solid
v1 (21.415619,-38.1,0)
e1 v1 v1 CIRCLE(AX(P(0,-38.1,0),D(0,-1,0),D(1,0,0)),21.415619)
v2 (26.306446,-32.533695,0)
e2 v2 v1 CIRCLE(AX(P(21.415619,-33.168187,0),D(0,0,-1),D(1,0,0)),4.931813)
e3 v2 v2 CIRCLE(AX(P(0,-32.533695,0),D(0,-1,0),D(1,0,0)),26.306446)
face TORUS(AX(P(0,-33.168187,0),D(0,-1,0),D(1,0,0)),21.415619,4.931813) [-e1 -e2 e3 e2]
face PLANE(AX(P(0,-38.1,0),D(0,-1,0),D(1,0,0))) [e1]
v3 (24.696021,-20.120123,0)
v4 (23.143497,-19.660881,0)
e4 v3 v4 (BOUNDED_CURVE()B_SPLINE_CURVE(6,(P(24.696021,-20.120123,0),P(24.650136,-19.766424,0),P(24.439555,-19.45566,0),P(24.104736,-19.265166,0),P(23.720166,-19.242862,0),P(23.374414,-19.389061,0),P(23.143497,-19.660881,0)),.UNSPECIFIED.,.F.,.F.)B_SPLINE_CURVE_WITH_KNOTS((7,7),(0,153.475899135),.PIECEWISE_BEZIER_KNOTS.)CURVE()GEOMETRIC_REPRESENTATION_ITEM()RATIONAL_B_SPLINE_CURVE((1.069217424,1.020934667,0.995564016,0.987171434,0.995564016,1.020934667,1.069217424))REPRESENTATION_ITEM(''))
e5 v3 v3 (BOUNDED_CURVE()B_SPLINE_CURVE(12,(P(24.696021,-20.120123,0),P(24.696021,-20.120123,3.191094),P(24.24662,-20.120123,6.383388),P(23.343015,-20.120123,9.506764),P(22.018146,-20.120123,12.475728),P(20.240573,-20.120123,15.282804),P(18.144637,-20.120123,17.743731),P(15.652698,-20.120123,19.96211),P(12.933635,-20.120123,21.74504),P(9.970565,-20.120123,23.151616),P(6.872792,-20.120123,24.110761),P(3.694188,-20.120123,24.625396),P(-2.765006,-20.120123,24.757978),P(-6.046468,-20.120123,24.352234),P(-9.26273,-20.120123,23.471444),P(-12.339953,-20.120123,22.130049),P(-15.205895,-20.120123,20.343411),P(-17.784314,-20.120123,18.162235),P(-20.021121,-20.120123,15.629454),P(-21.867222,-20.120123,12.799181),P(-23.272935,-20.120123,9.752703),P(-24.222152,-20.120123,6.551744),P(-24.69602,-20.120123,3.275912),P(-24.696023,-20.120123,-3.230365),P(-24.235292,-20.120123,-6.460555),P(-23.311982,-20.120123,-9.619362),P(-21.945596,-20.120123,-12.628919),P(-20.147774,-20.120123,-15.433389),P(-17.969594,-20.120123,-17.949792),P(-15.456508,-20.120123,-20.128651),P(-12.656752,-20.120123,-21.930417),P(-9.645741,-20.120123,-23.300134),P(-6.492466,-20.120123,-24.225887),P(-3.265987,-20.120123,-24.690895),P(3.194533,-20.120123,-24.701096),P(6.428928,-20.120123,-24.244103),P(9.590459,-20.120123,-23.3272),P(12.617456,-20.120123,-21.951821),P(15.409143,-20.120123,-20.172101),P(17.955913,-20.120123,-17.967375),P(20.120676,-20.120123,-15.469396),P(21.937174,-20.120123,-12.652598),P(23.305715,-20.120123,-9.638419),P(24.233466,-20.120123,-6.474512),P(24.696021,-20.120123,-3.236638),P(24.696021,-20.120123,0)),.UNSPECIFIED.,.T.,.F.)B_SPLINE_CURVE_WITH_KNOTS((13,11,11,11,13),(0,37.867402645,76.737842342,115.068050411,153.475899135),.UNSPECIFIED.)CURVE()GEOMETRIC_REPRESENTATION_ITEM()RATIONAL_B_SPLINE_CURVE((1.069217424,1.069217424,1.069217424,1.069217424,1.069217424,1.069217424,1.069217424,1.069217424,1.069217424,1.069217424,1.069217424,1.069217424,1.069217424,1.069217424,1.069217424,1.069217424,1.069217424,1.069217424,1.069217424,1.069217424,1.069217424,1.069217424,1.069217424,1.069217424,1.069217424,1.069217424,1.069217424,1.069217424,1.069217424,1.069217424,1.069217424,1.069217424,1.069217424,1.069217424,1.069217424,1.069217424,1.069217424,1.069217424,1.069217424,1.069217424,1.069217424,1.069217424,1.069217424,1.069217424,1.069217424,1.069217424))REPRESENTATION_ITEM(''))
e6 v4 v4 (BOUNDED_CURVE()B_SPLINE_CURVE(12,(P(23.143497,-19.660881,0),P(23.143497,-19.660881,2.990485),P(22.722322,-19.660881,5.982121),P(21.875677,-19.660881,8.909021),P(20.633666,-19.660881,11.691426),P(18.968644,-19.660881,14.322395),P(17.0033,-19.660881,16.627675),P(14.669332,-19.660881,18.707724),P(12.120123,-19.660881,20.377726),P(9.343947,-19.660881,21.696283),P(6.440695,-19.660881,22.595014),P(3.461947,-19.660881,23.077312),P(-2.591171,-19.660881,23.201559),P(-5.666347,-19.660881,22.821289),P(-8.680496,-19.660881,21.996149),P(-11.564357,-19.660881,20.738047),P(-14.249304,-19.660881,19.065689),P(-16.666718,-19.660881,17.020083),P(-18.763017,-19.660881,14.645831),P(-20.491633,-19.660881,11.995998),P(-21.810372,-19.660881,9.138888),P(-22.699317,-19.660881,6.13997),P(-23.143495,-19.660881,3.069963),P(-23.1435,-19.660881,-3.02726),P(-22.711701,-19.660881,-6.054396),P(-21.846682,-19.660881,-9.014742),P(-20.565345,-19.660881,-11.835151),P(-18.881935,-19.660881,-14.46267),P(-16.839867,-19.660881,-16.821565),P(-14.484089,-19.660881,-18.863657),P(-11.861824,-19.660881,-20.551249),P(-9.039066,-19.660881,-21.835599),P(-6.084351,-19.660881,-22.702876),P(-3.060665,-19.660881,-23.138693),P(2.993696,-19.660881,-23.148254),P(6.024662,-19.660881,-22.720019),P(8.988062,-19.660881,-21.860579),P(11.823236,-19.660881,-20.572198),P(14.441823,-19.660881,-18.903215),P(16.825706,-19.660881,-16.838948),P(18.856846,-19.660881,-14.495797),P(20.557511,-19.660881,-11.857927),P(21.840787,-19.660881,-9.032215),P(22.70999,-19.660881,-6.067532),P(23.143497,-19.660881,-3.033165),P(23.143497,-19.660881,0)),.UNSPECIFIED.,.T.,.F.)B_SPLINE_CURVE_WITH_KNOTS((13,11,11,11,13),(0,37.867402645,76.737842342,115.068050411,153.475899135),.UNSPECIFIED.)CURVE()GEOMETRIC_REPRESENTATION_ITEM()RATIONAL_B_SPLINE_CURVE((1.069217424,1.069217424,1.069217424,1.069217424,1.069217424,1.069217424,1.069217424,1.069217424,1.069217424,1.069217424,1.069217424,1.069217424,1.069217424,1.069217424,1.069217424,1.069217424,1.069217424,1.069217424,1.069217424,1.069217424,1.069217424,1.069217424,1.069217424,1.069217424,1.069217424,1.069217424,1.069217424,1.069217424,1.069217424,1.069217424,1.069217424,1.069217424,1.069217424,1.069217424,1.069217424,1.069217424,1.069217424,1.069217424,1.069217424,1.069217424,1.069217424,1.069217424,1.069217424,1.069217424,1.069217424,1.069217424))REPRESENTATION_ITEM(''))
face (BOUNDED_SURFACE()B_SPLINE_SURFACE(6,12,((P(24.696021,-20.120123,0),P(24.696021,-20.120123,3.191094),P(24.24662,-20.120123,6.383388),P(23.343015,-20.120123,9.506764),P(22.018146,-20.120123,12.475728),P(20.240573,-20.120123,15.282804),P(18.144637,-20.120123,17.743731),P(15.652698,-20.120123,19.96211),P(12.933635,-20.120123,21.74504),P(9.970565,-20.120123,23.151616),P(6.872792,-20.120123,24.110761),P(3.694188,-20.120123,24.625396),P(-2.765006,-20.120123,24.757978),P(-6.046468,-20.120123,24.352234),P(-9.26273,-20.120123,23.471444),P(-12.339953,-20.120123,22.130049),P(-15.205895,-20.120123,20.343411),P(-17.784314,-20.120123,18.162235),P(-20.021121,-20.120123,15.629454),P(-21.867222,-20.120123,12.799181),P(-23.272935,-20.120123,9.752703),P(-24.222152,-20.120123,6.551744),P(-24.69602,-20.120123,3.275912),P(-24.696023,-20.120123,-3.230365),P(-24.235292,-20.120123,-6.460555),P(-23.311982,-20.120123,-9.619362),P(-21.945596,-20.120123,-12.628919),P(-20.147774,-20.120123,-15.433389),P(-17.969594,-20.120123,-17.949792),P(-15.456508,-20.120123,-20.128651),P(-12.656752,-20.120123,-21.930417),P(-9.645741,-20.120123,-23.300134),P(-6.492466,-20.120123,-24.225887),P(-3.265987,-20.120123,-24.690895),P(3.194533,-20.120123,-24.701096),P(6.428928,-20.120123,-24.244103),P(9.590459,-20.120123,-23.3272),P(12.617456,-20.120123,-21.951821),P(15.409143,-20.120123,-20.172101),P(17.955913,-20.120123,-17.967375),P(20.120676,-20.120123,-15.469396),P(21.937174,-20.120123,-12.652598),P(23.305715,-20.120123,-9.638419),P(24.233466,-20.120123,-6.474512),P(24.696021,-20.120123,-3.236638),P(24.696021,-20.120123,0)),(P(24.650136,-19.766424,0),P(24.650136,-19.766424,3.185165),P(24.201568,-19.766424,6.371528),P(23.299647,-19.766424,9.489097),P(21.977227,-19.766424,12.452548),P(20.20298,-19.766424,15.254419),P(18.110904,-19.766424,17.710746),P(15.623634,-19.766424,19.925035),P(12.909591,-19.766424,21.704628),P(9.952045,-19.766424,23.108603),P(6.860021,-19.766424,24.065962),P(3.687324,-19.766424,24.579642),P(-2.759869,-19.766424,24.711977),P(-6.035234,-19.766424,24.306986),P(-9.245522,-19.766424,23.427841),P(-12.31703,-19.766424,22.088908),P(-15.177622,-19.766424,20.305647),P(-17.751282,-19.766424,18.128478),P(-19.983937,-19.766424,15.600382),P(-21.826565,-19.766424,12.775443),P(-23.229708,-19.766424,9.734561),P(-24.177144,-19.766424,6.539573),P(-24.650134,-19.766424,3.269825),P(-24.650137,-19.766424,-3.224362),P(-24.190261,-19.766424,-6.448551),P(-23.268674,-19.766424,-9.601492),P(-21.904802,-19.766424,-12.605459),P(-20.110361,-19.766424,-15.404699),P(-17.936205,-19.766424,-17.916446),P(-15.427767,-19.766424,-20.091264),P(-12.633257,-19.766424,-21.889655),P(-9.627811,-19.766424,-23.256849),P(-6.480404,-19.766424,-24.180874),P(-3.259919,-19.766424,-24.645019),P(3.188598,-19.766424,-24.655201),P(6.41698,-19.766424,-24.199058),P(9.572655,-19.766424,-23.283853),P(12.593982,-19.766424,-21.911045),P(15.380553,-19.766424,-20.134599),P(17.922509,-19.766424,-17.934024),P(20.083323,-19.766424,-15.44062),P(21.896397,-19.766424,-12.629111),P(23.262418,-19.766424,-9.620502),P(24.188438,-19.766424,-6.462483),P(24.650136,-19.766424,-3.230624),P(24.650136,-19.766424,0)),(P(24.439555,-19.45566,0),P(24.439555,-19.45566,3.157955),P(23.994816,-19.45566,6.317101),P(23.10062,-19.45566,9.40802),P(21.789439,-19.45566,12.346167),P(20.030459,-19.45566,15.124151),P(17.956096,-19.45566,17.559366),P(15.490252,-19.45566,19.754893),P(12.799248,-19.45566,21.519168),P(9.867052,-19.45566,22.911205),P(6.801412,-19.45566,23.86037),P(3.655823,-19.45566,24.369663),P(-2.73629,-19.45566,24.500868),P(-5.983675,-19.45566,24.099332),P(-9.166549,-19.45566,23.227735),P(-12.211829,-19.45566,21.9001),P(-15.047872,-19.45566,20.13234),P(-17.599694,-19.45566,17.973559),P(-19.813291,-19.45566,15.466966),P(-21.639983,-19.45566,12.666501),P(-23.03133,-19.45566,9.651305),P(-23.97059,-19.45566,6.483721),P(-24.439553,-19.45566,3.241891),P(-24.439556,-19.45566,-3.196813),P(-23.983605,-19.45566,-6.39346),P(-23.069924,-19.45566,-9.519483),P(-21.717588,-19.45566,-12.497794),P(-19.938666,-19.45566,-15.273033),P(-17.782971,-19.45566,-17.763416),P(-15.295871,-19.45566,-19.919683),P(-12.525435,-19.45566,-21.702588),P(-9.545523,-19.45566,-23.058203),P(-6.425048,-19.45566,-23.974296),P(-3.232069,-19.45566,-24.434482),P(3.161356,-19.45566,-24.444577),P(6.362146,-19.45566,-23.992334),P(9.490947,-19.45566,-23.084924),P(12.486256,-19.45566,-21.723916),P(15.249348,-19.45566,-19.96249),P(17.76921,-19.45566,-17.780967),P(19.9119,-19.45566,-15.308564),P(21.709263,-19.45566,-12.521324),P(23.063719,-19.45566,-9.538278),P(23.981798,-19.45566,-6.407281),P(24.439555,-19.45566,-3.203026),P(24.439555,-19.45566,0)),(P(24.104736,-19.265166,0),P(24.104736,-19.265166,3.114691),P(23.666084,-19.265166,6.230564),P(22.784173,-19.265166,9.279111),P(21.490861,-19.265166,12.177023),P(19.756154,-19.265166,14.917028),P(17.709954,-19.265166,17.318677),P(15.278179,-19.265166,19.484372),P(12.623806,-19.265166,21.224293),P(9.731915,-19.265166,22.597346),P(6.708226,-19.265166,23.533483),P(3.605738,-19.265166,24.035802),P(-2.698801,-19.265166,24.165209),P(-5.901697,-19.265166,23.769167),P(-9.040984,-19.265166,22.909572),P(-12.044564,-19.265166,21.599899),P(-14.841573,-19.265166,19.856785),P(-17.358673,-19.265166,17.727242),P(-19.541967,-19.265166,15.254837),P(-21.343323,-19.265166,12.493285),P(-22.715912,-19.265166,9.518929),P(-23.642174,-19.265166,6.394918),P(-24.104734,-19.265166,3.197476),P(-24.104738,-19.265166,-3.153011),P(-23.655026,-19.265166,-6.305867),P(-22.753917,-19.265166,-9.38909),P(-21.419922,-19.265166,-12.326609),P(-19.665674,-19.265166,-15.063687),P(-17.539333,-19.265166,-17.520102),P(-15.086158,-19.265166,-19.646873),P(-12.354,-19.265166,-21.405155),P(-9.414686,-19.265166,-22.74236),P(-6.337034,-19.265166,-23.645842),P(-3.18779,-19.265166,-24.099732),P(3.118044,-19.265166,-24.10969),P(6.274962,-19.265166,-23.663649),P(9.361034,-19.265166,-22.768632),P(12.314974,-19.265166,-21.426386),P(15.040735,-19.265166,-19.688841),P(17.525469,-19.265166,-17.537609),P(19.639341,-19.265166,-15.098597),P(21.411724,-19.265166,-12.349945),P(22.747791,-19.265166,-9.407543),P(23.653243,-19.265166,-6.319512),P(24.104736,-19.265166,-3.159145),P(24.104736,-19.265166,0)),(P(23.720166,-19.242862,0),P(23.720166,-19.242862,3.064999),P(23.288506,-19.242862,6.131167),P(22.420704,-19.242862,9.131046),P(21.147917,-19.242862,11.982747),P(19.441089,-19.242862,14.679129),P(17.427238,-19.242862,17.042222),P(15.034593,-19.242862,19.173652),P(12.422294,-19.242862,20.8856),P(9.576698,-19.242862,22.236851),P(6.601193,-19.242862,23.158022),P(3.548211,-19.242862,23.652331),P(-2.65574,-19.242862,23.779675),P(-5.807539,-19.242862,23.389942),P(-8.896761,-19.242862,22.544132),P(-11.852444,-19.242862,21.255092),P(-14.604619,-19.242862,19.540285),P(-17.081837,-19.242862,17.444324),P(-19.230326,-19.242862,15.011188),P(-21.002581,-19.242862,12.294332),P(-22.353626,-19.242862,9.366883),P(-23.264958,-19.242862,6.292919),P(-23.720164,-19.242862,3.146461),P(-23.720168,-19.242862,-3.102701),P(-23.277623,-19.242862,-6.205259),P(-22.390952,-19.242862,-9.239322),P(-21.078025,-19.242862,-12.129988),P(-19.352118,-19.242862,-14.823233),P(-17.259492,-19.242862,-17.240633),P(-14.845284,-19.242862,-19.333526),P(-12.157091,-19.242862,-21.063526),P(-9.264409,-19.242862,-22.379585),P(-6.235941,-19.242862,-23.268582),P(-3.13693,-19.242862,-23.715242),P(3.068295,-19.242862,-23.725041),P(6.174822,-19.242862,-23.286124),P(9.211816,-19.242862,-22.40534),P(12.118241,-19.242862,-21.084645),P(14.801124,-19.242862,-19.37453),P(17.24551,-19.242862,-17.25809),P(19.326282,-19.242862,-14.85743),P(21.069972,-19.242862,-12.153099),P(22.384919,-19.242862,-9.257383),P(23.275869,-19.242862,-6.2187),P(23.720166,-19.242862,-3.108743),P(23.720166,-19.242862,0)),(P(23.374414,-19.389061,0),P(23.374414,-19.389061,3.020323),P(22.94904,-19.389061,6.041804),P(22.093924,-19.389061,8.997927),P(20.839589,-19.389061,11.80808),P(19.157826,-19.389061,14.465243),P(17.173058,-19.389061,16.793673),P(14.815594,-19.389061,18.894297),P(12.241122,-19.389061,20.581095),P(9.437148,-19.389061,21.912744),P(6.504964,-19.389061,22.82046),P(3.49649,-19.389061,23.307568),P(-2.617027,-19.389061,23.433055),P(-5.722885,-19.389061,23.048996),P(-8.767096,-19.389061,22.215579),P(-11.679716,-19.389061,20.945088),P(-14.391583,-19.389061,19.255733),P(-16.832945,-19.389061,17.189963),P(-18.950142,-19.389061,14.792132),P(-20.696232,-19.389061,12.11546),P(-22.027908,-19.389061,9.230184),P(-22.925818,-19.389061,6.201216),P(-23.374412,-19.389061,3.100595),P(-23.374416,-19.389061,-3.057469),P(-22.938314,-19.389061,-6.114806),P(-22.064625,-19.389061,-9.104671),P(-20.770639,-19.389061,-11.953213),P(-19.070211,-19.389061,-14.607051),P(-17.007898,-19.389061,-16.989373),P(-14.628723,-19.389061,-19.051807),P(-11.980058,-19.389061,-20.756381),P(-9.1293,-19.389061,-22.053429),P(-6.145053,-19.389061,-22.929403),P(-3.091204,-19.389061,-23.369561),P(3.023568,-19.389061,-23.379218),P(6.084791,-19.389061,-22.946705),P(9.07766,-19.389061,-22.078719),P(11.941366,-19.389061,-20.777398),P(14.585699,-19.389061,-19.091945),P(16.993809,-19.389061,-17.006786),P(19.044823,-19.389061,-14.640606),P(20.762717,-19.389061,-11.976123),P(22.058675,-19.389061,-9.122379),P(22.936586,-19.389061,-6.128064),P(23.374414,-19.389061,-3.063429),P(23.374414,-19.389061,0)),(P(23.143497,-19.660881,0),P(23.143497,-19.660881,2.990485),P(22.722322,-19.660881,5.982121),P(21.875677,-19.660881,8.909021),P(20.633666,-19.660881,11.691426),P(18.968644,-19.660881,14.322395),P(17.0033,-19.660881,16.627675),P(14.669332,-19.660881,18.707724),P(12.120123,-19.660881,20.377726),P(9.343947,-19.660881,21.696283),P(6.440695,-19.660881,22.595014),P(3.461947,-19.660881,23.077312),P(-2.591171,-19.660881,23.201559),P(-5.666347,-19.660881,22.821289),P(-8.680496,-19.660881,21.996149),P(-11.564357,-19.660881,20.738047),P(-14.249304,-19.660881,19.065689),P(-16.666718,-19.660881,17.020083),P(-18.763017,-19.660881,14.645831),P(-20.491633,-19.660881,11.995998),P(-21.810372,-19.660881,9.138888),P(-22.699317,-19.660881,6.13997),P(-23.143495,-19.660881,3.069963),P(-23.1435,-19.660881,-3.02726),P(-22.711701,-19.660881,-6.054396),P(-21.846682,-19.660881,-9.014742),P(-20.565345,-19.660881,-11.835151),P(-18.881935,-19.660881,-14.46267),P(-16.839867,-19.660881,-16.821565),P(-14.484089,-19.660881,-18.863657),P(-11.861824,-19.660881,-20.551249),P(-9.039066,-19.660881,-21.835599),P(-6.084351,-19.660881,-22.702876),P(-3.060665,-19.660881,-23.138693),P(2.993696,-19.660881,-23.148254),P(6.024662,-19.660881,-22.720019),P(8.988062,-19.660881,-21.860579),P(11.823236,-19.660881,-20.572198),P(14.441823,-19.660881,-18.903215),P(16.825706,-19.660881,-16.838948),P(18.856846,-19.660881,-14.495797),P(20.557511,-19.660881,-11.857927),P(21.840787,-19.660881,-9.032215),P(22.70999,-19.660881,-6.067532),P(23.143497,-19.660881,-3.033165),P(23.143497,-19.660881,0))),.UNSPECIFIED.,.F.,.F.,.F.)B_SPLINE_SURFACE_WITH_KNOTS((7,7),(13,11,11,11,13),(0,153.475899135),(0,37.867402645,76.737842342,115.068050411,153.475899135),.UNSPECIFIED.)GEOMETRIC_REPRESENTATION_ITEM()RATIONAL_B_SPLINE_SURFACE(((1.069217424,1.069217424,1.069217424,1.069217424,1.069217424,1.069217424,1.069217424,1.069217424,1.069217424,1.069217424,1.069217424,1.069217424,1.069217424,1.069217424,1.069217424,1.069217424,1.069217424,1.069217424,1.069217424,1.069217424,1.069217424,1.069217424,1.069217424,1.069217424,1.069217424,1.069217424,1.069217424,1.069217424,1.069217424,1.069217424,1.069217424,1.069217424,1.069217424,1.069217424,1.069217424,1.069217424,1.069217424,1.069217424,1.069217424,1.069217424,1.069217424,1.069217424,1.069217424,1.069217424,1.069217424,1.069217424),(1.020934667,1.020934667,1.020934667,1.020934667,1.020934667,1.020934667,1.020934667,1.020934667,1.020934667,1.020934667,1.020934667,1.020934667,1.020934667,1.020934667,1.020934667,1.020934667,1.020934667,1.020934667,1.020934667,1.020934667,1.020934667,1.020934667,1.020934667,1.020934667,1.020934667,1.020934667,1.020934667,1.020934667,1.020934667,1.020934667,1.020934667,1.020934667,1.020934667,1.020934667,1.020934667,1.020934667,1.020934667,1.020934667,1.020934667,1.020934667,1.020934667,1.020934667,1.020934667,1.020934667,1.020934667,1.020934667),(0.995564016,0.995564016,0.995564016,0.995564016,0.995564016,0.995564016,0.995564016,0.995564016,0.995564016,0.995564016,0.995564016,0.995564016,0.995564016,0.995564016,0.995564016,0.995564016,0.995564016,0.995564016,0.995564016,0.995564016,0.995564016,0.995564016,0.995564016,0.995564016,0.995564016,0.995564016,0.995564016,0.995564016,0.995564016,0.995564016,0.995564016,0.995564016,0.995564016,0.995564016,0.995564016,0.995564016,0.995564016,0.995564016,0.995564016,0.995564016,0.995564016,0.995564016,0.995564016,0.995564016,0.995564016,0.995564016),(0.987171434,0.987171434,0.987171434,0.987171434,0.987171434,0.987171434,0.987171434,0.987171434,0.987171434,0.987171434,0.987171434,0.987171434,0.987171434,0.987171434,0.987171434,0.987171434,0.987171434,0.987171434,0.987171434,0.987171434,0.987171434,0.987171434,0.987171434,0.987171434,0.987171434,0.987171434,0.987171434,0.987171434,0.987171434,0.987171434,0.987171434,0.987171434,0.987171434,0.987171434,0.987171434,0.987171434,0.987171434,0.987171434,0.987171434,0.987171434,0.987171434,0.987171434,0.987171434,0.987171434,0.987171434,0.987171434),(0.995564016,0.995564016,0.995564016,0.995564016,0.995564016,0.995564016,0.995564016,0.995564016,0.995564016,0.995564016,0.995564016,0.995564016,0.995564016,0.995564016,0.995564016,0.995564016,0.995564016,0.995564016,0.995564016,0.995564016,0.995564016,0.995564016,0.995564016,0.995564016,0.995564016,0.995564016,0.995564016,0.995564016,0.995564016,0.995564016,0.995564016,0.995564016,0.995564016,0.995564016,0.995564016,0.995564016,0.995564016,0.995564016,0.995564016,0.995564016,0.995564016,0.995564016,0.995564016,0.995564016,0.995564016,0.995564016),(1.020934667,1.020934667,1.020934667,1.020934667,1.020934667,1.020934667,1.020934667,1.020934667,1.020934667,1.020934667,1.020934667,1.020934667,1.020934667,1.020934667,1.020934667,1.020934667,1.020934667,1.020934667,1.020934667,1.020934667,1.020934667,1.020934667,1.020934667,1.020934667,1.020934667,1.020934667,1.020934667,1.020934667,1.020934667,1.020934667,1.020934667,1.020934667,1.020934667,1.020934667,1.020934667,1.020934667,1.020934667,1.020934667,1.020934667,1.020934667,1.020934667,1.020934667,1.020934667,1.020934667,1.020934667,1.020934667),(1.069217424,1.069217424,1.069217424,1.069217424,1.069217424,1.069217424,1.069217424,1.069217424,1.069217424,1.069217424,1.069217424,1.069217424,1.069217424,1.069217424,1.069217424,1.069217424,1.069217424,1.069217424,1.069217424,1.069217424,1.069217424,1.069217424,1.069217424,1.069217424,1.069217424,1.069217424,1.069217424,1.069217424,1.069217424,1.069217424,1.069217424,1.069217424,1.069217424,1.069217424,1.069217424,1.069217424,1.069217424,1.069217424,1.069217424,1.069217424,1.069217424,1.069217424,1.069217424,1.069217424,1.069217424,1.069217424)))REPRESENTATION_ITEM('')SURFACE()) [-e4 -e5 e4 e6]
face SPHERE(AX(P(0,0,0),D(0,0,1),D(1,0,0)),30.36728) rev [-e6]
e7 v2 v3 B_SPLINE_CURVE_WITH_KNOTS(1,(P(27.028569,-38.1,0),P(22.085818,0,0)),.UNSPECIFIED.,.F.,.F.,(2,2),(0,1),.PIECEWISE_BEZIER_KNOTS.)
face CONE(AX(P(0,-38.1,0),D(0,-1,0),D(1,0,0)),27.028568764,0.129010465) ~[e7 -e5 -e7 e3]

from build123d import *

# Parameters (mm, degrees)
F4_R  = 27.0285687642
F2_R  = 22.0858176649
F9_R  = 0.8852297765
F10_R = 4.9318127202


# Not quite as in the source:
# - the program builds the solid bodies; features that only make, move or delete a surface that nothing else refers to are left out


with BuildPart() as f5:
    # F4 (on offset) → F5 section 0
    with BuildSketch(Plane.XZ.offset(38.1)):
        Circle(F4_R)
    # F2 (on Front) → F5 section 1
    with BuildSketch(Plane.XZ):
        Circle(F2_R)
    loft()


with BuildPart() as f7:
    # F6 (on Front) → F7 (revolve)
    with BuildSketch(Plane.XZ):
        with BuildLine():
            ThreePointArc((0, -30.3672800573), (30.3672800573, 0), (0, 30.3672800573))
            Line((0, 30.3672800573), (0, -30.3672800573))
        make_face()
    revolve(axis=Axis((0, 0, 0), (0, 0, -1)))


with BuildPart() as f5_1:
    add(f5.part)

    # F8: cut F7
    add(f7.part, mode=Mode.SUBTRACT)

    # F9
    f9_edges = [f5_1.edges().sort_by_distance(p)[0] for p in [
        (-24.426448, -18.042182, 0),
    ]]
    fillet(f9_edges, radius=F9_R)

    # F10
    f10_edges = [f5_1.edges().sort_by_distance(p)[0] for p in [
        (-27.028569, -38.1, 0),
    ]]
    fillet(f10_edges, radius=F10_R)


solid = f5_1.part
